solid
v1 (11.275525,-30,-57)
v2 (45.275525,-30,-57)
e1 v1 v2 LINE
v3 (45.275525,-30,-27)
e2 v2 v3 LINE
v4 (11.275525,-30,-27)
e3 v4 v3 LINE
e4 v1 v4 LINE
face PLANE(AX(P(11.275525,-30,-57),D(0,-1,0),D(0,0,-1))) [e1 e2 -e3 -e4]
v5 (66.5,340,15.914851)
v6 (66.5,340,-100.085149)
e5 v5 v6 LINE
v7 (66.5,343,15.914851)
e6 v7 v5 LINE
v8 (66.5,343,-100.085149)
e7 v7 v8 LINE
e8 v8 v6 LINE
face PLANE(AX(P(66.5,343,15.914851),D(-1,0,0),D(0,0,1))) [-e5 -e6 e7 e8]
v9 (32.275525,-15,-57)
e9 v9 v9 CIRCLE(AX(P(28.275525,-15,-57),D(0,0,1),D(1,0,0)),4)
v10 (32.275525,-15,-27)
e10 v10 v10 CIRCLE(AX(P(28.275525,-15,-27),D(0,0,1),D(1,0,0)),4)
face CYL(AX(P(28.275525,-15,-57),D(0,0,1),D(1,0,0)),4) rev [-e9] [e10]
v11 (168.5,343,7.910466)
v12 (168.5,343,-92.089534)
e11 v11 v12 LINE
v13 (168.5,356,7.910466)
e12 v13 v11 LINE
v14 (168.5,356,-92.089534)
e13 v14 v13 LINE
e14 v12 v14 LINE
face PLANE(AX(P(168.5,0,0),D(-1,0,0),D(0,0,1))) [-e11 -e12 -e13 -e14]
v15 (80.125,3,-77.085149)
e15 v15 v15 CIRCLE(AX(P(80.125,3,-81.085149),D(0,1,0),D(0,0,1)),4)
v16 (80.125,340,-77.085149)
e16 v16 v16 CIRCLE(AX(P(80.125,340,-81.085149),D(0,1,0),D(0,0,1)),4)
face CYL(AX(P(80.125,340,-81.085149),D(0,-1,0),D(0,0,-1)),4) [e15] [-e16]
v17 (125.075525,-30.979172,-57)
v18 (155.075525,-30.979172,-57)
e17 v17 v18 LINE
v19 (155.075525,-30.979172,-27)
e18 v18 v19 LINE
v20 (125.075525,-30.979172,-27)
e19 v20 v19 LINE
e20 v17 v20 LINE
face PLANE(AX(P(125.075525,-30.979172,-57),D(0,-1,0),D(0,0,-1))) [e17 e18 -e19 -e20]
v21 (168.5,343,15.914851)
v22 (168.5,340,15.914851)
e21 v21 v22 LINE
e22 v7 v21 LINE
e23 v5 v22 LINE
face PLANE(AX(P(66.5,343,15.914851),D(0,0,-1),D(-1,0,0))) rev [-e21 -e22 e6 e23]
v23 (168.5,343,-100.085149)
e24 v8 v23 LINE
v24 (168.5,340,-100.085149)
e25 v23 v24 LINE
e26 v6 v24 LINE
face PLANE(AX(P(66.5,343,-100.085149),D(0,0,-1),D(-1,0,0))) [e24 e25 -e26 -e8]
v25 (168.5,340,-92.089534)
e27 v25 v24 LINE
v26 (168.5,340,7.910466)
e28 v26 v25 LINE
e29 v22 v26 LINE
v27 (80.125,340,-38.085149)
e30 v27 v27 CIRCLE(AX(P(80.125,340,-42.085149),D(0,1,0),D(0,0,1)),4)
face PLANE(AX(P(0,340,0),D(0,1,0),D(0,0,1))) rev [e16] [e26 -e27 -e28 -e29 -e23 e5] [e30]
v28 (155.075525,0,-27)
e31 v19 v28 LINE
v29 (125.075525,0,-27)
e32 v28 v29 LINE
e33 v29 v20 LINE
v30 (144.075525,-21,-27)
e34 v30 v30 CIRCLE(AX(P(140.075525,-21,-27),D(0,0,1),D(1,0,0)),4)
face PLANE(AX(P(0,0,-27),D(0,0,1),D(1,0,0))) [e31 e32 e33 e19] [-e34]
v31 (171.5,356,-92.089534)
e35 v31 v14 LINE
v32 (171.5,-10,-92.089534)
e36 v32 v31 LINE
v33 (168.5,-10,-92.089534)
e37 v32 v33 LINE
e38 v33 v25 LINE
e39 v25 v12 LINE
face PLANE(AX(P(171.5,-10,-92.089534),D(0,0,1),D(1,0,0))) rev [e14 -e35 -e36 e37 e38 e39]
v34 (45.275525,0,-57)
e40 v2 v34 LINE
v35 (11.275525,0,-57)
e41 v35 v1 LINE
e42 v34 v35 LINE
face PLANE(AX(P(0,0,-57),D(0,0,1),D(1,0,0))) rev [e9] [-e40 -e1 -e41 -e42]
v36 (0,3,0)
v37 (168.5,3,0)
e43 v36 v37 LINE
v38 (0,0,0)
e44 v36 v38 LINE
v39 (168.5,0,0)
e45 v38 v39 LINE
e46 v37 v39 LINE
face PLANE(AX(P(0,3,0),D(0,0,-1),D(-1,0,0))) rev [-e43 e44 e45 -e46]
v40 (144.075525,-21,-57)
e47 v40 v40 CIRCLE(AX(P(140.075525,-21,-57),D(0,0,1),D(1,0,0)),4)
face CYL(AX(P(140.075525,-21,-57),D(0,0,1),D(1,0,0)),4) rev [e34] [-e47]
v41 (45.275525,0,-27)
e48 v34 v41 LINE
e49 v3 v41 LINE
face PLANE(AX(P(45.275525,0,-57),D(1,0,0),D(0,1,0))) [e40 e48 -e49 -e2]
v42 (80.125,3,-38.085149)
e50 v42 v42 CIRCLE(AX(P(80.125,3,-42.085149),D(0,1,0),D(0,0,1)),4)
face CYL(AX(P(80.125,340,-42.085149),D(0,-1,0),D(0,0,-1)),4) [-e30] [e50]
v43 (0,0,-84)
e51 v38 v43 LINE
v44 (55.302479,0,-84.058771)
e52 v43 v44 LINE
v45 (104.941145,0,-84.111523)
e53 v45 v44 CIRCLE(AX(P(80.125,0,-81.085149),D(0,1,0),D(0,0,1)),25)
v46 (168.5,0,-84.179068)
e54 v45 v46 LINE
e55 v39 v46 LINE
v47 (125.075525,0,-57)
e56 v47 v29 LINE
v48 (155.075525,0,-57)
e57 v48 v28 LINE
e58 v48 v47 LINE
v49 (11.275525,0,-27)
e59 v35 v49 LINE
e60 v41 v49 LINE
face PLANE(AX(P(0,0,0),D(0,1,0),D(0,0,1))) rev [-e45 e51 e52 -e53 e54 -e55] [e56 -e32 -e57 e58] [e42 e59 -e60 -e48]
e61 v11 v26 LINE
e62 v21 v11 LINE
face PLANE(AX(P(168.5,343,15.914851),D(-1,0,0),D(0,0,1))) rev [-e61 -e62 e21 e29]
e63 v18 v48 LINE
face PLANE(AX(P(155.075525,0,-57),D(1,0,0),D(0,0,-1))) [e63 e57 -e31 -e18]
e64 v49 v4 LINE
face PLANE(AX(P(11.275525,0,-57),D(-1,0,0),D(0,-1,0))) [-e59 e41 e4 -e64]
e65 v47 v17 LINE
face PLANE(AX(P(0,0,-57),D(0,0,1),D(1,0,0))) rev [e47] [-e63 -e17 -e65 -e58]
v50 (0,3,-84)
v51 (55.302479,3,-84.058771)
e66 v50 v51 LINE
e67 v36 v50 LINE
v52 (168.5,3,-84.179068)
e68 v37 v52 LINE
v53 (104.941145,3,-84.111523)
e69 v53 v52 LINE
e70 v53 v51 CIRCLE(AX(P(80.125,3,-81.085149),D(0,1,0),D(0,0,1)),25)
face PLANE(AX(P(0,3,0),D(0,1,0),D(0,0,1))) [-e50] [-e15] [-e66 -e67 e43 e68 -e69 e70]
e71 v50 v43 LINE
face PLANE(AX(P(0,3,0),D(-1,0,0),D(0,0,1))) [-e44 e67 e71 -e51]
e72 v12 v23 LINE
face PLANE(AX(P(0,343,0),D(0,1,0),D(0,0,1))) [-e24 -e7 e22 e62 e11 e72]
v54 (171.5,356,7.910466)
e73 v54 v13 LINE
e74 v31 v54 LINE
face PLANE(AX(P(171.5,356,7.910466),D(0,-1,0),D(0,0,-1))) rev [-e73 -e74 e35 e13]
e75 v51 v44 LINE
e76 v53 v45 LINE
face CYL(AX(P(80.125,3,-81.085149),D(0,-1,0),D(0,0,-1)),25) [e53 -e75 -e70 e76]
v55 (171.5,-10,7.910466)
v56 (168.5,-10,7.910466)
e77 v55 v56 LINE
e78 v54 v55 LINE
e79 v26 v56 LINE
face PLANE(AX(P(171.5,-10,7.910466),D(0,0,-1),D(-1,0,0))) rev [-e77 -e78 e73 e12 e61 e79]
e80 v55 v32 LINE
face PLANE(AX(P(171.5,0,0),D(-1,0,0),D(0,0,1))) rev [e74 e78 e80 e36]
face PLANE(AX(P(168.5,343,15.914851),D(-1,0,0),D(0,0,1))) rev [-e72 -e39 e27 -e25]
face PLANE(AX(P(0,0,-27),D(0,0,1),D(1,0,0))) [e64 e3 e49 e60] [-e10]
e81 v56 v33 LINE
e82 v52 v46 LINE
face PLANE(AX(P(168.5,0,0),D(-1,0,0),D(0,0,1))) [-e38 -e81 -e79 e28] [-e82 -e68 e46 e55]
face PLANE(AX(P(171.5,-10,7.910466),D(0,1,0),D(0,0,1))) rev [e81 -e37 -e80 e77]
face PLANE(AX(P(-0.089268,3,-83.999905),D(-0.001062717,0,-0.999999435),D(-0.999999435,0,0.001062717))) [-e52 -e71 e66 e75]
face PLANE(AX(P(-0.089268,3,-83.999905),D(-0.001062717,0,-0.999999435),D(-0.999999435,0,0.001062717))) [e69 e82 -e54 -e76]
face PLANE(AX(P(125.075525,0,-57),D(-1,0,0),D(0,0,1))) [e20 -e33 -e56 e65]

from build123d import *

# Parameters (mm, degrees)
SKETCH1_R                 = 4
BOSS_EXTRUDE1_DEPTH       = 3
SKETCH1_3_R               = 4
BOSS_EXTRUDE2_DEPTH       = 340
BOSS_EXTRUDE3_START       = -30
BOSS_EXTRUDE3_OUTLINE_W   = 34
BOSS_EXTRUDE3_OUTLINE_H   = 30
BOSS_EXTRUDE3_OUTLINE_R   = 4
BOSS_EXTRUDE3_OUTLINE_W_2 = 30
BOSS_EXTRUDE3_OUTLINE_H_2 = 30.979171587
BOSS_EXTRUDE3_DEPTH       = 30
SKETCH5_W                 = 100
SKETCH5_H                 = 366
BOSS_EXTRUDE4_DEPTH       = 3
SKETCH6_W                 = 102
SKETCH6_H                 = 116
BOSS_EXTRUDE6_DEPTH       = 3


# Read off the part's stored shape, not the designer's step: Boss-Extrude3
with BuildPart() as part:
    # Sketch1 → Boss-Extrude1 (new body)
    with BuildSketch(Plane(origin=(0, 0, 0), x_dir=(1, 0, 0), z_dir=(0, 1, 0))):
        with BuildLine():
            Line((0, 84), (0, 0))
            Line((0, 0), (168.5, 0))
            Line((168.5, 0), (168.5, 84.179067966))
            Line((168.5, 84.179067966), (104.941145125, 84.111522833))
            ThreePointArc((104.941145125, 84.111522833), (80.098432068, 106.08513446), (55.302478571, 84.058770934))
            Line((55.302478571, 84.058770934), (0, 84))
        make_face()
        with Locations(Location((80.125, 42.085148577, 0), (0, 0, 270))):
            Circle(SKETCH1_R, mode=Mode.SUBTRACT)
        with Locations(Location((80.125, 81.085148577, 0), (0, 0, 270))):
            Circle(SKETCH1_R, mode=Mode.SUBTRACT)
    extrude(amount=BOSS_EXTRUDE1_DEPTH)

    # Sketch1<3> → Boss-Extrude2 (add)
    with BuildSketch(Plane(origin=(0, 0, 0), x_dir=(1, 0, 0), z_dir=(0, 1, 0))):
        with BuildLine():
            ThreePointArc((82.767561665, 84.087958569), (80.120749131, 85.085146319), (77.476062031, 84.082335198))
            Line((77.476062031, 84.082335198), (82.767561665, 84.087958569))
        make_face()
        with BuildLine():
            Line((82.767561665, 84.087958569), (77.476062031, 84.082335198))
            ThreePointArc((77.476062031, 84.082335198), (78.481186123, 77.438523297), (84.125, 81.085148577))
            ThreePointArc((84.125, 81.085148577), (83.769876312, 82.732836858), (82.767561665, 84.087958569))
        make_face()
        with Locations(Location((80.125, 42.085148577, 0), (0, 0, 270))):
            Circle(SKETCH1_3_R)
    extrude(amount=BOSS_EXTRUDE2_DEPTH)

    # Boss-Extrude3 outline → Boss-Extrude3 (add)
    # profile 1 of 2: a face of its own
    with BuildSketch(Plane.XY.offset(-27).offset(BOSS_EXTRUDE3_START)):
        with Locations((28.275525376, -15)):
            Rectangle(BOSS_EXTRUDE3_OUTLINE_W, BOSS_EXTRUDE3_OUTLINE_H)
        with Locations((28.275525376, -15)):
            Circle(BOSS_EXTRUDE3_OUTLINE_R, mode=Mode.SUBTRACT)
    # profile 2 of 2: a face of its own
    with BuildSketch(Plane.XY.offset(-27).offset(BOSS_EXTRUDE3_START)):
        with Locations((140.075525376, -15.489585794)):
            Rectangle(BOSS_EXTRUDE3_OUTLINE_W_2, BOSS_EXTRUDE3_OUTLINE_H_2)
        with Locations((140.075525376, -21)):
            Circle(BOSS_EXTRUDE3_OUTLINE_R, mode=Mode.SUBTRACT)
    extrude(amount=BOSS_EXTRUDE3_DEPTH)

    # Sketch5 → Boss-Extrude4 (add)
    with BuildSketch(Plane(origin=(168.5, 0, 0), x_dir=(0, 0, -1), z_dir=(1, 0, 0))):
        with Locations((42.089533983, 173)):
            Rectangle(SKETCH5_W, SKETCH5_H)
    extrude(amount=BOSS_EXTRUDE4_DEPTH)

    # Sketch6 → Boss-Extrude6 (add)
    with BuildSketch(Plane(origin=(0, 340, 0), x_dir=(1, 0, 0), z_dir=(0, 1, 0))):
        with Locations((117.5, 42.085148577)):
            Rectangle(SKETCH6_W, SKETCH6_H)
    extrude(amount=BOSS_EXTRUDE6_DEPTH)


solid = part.part
